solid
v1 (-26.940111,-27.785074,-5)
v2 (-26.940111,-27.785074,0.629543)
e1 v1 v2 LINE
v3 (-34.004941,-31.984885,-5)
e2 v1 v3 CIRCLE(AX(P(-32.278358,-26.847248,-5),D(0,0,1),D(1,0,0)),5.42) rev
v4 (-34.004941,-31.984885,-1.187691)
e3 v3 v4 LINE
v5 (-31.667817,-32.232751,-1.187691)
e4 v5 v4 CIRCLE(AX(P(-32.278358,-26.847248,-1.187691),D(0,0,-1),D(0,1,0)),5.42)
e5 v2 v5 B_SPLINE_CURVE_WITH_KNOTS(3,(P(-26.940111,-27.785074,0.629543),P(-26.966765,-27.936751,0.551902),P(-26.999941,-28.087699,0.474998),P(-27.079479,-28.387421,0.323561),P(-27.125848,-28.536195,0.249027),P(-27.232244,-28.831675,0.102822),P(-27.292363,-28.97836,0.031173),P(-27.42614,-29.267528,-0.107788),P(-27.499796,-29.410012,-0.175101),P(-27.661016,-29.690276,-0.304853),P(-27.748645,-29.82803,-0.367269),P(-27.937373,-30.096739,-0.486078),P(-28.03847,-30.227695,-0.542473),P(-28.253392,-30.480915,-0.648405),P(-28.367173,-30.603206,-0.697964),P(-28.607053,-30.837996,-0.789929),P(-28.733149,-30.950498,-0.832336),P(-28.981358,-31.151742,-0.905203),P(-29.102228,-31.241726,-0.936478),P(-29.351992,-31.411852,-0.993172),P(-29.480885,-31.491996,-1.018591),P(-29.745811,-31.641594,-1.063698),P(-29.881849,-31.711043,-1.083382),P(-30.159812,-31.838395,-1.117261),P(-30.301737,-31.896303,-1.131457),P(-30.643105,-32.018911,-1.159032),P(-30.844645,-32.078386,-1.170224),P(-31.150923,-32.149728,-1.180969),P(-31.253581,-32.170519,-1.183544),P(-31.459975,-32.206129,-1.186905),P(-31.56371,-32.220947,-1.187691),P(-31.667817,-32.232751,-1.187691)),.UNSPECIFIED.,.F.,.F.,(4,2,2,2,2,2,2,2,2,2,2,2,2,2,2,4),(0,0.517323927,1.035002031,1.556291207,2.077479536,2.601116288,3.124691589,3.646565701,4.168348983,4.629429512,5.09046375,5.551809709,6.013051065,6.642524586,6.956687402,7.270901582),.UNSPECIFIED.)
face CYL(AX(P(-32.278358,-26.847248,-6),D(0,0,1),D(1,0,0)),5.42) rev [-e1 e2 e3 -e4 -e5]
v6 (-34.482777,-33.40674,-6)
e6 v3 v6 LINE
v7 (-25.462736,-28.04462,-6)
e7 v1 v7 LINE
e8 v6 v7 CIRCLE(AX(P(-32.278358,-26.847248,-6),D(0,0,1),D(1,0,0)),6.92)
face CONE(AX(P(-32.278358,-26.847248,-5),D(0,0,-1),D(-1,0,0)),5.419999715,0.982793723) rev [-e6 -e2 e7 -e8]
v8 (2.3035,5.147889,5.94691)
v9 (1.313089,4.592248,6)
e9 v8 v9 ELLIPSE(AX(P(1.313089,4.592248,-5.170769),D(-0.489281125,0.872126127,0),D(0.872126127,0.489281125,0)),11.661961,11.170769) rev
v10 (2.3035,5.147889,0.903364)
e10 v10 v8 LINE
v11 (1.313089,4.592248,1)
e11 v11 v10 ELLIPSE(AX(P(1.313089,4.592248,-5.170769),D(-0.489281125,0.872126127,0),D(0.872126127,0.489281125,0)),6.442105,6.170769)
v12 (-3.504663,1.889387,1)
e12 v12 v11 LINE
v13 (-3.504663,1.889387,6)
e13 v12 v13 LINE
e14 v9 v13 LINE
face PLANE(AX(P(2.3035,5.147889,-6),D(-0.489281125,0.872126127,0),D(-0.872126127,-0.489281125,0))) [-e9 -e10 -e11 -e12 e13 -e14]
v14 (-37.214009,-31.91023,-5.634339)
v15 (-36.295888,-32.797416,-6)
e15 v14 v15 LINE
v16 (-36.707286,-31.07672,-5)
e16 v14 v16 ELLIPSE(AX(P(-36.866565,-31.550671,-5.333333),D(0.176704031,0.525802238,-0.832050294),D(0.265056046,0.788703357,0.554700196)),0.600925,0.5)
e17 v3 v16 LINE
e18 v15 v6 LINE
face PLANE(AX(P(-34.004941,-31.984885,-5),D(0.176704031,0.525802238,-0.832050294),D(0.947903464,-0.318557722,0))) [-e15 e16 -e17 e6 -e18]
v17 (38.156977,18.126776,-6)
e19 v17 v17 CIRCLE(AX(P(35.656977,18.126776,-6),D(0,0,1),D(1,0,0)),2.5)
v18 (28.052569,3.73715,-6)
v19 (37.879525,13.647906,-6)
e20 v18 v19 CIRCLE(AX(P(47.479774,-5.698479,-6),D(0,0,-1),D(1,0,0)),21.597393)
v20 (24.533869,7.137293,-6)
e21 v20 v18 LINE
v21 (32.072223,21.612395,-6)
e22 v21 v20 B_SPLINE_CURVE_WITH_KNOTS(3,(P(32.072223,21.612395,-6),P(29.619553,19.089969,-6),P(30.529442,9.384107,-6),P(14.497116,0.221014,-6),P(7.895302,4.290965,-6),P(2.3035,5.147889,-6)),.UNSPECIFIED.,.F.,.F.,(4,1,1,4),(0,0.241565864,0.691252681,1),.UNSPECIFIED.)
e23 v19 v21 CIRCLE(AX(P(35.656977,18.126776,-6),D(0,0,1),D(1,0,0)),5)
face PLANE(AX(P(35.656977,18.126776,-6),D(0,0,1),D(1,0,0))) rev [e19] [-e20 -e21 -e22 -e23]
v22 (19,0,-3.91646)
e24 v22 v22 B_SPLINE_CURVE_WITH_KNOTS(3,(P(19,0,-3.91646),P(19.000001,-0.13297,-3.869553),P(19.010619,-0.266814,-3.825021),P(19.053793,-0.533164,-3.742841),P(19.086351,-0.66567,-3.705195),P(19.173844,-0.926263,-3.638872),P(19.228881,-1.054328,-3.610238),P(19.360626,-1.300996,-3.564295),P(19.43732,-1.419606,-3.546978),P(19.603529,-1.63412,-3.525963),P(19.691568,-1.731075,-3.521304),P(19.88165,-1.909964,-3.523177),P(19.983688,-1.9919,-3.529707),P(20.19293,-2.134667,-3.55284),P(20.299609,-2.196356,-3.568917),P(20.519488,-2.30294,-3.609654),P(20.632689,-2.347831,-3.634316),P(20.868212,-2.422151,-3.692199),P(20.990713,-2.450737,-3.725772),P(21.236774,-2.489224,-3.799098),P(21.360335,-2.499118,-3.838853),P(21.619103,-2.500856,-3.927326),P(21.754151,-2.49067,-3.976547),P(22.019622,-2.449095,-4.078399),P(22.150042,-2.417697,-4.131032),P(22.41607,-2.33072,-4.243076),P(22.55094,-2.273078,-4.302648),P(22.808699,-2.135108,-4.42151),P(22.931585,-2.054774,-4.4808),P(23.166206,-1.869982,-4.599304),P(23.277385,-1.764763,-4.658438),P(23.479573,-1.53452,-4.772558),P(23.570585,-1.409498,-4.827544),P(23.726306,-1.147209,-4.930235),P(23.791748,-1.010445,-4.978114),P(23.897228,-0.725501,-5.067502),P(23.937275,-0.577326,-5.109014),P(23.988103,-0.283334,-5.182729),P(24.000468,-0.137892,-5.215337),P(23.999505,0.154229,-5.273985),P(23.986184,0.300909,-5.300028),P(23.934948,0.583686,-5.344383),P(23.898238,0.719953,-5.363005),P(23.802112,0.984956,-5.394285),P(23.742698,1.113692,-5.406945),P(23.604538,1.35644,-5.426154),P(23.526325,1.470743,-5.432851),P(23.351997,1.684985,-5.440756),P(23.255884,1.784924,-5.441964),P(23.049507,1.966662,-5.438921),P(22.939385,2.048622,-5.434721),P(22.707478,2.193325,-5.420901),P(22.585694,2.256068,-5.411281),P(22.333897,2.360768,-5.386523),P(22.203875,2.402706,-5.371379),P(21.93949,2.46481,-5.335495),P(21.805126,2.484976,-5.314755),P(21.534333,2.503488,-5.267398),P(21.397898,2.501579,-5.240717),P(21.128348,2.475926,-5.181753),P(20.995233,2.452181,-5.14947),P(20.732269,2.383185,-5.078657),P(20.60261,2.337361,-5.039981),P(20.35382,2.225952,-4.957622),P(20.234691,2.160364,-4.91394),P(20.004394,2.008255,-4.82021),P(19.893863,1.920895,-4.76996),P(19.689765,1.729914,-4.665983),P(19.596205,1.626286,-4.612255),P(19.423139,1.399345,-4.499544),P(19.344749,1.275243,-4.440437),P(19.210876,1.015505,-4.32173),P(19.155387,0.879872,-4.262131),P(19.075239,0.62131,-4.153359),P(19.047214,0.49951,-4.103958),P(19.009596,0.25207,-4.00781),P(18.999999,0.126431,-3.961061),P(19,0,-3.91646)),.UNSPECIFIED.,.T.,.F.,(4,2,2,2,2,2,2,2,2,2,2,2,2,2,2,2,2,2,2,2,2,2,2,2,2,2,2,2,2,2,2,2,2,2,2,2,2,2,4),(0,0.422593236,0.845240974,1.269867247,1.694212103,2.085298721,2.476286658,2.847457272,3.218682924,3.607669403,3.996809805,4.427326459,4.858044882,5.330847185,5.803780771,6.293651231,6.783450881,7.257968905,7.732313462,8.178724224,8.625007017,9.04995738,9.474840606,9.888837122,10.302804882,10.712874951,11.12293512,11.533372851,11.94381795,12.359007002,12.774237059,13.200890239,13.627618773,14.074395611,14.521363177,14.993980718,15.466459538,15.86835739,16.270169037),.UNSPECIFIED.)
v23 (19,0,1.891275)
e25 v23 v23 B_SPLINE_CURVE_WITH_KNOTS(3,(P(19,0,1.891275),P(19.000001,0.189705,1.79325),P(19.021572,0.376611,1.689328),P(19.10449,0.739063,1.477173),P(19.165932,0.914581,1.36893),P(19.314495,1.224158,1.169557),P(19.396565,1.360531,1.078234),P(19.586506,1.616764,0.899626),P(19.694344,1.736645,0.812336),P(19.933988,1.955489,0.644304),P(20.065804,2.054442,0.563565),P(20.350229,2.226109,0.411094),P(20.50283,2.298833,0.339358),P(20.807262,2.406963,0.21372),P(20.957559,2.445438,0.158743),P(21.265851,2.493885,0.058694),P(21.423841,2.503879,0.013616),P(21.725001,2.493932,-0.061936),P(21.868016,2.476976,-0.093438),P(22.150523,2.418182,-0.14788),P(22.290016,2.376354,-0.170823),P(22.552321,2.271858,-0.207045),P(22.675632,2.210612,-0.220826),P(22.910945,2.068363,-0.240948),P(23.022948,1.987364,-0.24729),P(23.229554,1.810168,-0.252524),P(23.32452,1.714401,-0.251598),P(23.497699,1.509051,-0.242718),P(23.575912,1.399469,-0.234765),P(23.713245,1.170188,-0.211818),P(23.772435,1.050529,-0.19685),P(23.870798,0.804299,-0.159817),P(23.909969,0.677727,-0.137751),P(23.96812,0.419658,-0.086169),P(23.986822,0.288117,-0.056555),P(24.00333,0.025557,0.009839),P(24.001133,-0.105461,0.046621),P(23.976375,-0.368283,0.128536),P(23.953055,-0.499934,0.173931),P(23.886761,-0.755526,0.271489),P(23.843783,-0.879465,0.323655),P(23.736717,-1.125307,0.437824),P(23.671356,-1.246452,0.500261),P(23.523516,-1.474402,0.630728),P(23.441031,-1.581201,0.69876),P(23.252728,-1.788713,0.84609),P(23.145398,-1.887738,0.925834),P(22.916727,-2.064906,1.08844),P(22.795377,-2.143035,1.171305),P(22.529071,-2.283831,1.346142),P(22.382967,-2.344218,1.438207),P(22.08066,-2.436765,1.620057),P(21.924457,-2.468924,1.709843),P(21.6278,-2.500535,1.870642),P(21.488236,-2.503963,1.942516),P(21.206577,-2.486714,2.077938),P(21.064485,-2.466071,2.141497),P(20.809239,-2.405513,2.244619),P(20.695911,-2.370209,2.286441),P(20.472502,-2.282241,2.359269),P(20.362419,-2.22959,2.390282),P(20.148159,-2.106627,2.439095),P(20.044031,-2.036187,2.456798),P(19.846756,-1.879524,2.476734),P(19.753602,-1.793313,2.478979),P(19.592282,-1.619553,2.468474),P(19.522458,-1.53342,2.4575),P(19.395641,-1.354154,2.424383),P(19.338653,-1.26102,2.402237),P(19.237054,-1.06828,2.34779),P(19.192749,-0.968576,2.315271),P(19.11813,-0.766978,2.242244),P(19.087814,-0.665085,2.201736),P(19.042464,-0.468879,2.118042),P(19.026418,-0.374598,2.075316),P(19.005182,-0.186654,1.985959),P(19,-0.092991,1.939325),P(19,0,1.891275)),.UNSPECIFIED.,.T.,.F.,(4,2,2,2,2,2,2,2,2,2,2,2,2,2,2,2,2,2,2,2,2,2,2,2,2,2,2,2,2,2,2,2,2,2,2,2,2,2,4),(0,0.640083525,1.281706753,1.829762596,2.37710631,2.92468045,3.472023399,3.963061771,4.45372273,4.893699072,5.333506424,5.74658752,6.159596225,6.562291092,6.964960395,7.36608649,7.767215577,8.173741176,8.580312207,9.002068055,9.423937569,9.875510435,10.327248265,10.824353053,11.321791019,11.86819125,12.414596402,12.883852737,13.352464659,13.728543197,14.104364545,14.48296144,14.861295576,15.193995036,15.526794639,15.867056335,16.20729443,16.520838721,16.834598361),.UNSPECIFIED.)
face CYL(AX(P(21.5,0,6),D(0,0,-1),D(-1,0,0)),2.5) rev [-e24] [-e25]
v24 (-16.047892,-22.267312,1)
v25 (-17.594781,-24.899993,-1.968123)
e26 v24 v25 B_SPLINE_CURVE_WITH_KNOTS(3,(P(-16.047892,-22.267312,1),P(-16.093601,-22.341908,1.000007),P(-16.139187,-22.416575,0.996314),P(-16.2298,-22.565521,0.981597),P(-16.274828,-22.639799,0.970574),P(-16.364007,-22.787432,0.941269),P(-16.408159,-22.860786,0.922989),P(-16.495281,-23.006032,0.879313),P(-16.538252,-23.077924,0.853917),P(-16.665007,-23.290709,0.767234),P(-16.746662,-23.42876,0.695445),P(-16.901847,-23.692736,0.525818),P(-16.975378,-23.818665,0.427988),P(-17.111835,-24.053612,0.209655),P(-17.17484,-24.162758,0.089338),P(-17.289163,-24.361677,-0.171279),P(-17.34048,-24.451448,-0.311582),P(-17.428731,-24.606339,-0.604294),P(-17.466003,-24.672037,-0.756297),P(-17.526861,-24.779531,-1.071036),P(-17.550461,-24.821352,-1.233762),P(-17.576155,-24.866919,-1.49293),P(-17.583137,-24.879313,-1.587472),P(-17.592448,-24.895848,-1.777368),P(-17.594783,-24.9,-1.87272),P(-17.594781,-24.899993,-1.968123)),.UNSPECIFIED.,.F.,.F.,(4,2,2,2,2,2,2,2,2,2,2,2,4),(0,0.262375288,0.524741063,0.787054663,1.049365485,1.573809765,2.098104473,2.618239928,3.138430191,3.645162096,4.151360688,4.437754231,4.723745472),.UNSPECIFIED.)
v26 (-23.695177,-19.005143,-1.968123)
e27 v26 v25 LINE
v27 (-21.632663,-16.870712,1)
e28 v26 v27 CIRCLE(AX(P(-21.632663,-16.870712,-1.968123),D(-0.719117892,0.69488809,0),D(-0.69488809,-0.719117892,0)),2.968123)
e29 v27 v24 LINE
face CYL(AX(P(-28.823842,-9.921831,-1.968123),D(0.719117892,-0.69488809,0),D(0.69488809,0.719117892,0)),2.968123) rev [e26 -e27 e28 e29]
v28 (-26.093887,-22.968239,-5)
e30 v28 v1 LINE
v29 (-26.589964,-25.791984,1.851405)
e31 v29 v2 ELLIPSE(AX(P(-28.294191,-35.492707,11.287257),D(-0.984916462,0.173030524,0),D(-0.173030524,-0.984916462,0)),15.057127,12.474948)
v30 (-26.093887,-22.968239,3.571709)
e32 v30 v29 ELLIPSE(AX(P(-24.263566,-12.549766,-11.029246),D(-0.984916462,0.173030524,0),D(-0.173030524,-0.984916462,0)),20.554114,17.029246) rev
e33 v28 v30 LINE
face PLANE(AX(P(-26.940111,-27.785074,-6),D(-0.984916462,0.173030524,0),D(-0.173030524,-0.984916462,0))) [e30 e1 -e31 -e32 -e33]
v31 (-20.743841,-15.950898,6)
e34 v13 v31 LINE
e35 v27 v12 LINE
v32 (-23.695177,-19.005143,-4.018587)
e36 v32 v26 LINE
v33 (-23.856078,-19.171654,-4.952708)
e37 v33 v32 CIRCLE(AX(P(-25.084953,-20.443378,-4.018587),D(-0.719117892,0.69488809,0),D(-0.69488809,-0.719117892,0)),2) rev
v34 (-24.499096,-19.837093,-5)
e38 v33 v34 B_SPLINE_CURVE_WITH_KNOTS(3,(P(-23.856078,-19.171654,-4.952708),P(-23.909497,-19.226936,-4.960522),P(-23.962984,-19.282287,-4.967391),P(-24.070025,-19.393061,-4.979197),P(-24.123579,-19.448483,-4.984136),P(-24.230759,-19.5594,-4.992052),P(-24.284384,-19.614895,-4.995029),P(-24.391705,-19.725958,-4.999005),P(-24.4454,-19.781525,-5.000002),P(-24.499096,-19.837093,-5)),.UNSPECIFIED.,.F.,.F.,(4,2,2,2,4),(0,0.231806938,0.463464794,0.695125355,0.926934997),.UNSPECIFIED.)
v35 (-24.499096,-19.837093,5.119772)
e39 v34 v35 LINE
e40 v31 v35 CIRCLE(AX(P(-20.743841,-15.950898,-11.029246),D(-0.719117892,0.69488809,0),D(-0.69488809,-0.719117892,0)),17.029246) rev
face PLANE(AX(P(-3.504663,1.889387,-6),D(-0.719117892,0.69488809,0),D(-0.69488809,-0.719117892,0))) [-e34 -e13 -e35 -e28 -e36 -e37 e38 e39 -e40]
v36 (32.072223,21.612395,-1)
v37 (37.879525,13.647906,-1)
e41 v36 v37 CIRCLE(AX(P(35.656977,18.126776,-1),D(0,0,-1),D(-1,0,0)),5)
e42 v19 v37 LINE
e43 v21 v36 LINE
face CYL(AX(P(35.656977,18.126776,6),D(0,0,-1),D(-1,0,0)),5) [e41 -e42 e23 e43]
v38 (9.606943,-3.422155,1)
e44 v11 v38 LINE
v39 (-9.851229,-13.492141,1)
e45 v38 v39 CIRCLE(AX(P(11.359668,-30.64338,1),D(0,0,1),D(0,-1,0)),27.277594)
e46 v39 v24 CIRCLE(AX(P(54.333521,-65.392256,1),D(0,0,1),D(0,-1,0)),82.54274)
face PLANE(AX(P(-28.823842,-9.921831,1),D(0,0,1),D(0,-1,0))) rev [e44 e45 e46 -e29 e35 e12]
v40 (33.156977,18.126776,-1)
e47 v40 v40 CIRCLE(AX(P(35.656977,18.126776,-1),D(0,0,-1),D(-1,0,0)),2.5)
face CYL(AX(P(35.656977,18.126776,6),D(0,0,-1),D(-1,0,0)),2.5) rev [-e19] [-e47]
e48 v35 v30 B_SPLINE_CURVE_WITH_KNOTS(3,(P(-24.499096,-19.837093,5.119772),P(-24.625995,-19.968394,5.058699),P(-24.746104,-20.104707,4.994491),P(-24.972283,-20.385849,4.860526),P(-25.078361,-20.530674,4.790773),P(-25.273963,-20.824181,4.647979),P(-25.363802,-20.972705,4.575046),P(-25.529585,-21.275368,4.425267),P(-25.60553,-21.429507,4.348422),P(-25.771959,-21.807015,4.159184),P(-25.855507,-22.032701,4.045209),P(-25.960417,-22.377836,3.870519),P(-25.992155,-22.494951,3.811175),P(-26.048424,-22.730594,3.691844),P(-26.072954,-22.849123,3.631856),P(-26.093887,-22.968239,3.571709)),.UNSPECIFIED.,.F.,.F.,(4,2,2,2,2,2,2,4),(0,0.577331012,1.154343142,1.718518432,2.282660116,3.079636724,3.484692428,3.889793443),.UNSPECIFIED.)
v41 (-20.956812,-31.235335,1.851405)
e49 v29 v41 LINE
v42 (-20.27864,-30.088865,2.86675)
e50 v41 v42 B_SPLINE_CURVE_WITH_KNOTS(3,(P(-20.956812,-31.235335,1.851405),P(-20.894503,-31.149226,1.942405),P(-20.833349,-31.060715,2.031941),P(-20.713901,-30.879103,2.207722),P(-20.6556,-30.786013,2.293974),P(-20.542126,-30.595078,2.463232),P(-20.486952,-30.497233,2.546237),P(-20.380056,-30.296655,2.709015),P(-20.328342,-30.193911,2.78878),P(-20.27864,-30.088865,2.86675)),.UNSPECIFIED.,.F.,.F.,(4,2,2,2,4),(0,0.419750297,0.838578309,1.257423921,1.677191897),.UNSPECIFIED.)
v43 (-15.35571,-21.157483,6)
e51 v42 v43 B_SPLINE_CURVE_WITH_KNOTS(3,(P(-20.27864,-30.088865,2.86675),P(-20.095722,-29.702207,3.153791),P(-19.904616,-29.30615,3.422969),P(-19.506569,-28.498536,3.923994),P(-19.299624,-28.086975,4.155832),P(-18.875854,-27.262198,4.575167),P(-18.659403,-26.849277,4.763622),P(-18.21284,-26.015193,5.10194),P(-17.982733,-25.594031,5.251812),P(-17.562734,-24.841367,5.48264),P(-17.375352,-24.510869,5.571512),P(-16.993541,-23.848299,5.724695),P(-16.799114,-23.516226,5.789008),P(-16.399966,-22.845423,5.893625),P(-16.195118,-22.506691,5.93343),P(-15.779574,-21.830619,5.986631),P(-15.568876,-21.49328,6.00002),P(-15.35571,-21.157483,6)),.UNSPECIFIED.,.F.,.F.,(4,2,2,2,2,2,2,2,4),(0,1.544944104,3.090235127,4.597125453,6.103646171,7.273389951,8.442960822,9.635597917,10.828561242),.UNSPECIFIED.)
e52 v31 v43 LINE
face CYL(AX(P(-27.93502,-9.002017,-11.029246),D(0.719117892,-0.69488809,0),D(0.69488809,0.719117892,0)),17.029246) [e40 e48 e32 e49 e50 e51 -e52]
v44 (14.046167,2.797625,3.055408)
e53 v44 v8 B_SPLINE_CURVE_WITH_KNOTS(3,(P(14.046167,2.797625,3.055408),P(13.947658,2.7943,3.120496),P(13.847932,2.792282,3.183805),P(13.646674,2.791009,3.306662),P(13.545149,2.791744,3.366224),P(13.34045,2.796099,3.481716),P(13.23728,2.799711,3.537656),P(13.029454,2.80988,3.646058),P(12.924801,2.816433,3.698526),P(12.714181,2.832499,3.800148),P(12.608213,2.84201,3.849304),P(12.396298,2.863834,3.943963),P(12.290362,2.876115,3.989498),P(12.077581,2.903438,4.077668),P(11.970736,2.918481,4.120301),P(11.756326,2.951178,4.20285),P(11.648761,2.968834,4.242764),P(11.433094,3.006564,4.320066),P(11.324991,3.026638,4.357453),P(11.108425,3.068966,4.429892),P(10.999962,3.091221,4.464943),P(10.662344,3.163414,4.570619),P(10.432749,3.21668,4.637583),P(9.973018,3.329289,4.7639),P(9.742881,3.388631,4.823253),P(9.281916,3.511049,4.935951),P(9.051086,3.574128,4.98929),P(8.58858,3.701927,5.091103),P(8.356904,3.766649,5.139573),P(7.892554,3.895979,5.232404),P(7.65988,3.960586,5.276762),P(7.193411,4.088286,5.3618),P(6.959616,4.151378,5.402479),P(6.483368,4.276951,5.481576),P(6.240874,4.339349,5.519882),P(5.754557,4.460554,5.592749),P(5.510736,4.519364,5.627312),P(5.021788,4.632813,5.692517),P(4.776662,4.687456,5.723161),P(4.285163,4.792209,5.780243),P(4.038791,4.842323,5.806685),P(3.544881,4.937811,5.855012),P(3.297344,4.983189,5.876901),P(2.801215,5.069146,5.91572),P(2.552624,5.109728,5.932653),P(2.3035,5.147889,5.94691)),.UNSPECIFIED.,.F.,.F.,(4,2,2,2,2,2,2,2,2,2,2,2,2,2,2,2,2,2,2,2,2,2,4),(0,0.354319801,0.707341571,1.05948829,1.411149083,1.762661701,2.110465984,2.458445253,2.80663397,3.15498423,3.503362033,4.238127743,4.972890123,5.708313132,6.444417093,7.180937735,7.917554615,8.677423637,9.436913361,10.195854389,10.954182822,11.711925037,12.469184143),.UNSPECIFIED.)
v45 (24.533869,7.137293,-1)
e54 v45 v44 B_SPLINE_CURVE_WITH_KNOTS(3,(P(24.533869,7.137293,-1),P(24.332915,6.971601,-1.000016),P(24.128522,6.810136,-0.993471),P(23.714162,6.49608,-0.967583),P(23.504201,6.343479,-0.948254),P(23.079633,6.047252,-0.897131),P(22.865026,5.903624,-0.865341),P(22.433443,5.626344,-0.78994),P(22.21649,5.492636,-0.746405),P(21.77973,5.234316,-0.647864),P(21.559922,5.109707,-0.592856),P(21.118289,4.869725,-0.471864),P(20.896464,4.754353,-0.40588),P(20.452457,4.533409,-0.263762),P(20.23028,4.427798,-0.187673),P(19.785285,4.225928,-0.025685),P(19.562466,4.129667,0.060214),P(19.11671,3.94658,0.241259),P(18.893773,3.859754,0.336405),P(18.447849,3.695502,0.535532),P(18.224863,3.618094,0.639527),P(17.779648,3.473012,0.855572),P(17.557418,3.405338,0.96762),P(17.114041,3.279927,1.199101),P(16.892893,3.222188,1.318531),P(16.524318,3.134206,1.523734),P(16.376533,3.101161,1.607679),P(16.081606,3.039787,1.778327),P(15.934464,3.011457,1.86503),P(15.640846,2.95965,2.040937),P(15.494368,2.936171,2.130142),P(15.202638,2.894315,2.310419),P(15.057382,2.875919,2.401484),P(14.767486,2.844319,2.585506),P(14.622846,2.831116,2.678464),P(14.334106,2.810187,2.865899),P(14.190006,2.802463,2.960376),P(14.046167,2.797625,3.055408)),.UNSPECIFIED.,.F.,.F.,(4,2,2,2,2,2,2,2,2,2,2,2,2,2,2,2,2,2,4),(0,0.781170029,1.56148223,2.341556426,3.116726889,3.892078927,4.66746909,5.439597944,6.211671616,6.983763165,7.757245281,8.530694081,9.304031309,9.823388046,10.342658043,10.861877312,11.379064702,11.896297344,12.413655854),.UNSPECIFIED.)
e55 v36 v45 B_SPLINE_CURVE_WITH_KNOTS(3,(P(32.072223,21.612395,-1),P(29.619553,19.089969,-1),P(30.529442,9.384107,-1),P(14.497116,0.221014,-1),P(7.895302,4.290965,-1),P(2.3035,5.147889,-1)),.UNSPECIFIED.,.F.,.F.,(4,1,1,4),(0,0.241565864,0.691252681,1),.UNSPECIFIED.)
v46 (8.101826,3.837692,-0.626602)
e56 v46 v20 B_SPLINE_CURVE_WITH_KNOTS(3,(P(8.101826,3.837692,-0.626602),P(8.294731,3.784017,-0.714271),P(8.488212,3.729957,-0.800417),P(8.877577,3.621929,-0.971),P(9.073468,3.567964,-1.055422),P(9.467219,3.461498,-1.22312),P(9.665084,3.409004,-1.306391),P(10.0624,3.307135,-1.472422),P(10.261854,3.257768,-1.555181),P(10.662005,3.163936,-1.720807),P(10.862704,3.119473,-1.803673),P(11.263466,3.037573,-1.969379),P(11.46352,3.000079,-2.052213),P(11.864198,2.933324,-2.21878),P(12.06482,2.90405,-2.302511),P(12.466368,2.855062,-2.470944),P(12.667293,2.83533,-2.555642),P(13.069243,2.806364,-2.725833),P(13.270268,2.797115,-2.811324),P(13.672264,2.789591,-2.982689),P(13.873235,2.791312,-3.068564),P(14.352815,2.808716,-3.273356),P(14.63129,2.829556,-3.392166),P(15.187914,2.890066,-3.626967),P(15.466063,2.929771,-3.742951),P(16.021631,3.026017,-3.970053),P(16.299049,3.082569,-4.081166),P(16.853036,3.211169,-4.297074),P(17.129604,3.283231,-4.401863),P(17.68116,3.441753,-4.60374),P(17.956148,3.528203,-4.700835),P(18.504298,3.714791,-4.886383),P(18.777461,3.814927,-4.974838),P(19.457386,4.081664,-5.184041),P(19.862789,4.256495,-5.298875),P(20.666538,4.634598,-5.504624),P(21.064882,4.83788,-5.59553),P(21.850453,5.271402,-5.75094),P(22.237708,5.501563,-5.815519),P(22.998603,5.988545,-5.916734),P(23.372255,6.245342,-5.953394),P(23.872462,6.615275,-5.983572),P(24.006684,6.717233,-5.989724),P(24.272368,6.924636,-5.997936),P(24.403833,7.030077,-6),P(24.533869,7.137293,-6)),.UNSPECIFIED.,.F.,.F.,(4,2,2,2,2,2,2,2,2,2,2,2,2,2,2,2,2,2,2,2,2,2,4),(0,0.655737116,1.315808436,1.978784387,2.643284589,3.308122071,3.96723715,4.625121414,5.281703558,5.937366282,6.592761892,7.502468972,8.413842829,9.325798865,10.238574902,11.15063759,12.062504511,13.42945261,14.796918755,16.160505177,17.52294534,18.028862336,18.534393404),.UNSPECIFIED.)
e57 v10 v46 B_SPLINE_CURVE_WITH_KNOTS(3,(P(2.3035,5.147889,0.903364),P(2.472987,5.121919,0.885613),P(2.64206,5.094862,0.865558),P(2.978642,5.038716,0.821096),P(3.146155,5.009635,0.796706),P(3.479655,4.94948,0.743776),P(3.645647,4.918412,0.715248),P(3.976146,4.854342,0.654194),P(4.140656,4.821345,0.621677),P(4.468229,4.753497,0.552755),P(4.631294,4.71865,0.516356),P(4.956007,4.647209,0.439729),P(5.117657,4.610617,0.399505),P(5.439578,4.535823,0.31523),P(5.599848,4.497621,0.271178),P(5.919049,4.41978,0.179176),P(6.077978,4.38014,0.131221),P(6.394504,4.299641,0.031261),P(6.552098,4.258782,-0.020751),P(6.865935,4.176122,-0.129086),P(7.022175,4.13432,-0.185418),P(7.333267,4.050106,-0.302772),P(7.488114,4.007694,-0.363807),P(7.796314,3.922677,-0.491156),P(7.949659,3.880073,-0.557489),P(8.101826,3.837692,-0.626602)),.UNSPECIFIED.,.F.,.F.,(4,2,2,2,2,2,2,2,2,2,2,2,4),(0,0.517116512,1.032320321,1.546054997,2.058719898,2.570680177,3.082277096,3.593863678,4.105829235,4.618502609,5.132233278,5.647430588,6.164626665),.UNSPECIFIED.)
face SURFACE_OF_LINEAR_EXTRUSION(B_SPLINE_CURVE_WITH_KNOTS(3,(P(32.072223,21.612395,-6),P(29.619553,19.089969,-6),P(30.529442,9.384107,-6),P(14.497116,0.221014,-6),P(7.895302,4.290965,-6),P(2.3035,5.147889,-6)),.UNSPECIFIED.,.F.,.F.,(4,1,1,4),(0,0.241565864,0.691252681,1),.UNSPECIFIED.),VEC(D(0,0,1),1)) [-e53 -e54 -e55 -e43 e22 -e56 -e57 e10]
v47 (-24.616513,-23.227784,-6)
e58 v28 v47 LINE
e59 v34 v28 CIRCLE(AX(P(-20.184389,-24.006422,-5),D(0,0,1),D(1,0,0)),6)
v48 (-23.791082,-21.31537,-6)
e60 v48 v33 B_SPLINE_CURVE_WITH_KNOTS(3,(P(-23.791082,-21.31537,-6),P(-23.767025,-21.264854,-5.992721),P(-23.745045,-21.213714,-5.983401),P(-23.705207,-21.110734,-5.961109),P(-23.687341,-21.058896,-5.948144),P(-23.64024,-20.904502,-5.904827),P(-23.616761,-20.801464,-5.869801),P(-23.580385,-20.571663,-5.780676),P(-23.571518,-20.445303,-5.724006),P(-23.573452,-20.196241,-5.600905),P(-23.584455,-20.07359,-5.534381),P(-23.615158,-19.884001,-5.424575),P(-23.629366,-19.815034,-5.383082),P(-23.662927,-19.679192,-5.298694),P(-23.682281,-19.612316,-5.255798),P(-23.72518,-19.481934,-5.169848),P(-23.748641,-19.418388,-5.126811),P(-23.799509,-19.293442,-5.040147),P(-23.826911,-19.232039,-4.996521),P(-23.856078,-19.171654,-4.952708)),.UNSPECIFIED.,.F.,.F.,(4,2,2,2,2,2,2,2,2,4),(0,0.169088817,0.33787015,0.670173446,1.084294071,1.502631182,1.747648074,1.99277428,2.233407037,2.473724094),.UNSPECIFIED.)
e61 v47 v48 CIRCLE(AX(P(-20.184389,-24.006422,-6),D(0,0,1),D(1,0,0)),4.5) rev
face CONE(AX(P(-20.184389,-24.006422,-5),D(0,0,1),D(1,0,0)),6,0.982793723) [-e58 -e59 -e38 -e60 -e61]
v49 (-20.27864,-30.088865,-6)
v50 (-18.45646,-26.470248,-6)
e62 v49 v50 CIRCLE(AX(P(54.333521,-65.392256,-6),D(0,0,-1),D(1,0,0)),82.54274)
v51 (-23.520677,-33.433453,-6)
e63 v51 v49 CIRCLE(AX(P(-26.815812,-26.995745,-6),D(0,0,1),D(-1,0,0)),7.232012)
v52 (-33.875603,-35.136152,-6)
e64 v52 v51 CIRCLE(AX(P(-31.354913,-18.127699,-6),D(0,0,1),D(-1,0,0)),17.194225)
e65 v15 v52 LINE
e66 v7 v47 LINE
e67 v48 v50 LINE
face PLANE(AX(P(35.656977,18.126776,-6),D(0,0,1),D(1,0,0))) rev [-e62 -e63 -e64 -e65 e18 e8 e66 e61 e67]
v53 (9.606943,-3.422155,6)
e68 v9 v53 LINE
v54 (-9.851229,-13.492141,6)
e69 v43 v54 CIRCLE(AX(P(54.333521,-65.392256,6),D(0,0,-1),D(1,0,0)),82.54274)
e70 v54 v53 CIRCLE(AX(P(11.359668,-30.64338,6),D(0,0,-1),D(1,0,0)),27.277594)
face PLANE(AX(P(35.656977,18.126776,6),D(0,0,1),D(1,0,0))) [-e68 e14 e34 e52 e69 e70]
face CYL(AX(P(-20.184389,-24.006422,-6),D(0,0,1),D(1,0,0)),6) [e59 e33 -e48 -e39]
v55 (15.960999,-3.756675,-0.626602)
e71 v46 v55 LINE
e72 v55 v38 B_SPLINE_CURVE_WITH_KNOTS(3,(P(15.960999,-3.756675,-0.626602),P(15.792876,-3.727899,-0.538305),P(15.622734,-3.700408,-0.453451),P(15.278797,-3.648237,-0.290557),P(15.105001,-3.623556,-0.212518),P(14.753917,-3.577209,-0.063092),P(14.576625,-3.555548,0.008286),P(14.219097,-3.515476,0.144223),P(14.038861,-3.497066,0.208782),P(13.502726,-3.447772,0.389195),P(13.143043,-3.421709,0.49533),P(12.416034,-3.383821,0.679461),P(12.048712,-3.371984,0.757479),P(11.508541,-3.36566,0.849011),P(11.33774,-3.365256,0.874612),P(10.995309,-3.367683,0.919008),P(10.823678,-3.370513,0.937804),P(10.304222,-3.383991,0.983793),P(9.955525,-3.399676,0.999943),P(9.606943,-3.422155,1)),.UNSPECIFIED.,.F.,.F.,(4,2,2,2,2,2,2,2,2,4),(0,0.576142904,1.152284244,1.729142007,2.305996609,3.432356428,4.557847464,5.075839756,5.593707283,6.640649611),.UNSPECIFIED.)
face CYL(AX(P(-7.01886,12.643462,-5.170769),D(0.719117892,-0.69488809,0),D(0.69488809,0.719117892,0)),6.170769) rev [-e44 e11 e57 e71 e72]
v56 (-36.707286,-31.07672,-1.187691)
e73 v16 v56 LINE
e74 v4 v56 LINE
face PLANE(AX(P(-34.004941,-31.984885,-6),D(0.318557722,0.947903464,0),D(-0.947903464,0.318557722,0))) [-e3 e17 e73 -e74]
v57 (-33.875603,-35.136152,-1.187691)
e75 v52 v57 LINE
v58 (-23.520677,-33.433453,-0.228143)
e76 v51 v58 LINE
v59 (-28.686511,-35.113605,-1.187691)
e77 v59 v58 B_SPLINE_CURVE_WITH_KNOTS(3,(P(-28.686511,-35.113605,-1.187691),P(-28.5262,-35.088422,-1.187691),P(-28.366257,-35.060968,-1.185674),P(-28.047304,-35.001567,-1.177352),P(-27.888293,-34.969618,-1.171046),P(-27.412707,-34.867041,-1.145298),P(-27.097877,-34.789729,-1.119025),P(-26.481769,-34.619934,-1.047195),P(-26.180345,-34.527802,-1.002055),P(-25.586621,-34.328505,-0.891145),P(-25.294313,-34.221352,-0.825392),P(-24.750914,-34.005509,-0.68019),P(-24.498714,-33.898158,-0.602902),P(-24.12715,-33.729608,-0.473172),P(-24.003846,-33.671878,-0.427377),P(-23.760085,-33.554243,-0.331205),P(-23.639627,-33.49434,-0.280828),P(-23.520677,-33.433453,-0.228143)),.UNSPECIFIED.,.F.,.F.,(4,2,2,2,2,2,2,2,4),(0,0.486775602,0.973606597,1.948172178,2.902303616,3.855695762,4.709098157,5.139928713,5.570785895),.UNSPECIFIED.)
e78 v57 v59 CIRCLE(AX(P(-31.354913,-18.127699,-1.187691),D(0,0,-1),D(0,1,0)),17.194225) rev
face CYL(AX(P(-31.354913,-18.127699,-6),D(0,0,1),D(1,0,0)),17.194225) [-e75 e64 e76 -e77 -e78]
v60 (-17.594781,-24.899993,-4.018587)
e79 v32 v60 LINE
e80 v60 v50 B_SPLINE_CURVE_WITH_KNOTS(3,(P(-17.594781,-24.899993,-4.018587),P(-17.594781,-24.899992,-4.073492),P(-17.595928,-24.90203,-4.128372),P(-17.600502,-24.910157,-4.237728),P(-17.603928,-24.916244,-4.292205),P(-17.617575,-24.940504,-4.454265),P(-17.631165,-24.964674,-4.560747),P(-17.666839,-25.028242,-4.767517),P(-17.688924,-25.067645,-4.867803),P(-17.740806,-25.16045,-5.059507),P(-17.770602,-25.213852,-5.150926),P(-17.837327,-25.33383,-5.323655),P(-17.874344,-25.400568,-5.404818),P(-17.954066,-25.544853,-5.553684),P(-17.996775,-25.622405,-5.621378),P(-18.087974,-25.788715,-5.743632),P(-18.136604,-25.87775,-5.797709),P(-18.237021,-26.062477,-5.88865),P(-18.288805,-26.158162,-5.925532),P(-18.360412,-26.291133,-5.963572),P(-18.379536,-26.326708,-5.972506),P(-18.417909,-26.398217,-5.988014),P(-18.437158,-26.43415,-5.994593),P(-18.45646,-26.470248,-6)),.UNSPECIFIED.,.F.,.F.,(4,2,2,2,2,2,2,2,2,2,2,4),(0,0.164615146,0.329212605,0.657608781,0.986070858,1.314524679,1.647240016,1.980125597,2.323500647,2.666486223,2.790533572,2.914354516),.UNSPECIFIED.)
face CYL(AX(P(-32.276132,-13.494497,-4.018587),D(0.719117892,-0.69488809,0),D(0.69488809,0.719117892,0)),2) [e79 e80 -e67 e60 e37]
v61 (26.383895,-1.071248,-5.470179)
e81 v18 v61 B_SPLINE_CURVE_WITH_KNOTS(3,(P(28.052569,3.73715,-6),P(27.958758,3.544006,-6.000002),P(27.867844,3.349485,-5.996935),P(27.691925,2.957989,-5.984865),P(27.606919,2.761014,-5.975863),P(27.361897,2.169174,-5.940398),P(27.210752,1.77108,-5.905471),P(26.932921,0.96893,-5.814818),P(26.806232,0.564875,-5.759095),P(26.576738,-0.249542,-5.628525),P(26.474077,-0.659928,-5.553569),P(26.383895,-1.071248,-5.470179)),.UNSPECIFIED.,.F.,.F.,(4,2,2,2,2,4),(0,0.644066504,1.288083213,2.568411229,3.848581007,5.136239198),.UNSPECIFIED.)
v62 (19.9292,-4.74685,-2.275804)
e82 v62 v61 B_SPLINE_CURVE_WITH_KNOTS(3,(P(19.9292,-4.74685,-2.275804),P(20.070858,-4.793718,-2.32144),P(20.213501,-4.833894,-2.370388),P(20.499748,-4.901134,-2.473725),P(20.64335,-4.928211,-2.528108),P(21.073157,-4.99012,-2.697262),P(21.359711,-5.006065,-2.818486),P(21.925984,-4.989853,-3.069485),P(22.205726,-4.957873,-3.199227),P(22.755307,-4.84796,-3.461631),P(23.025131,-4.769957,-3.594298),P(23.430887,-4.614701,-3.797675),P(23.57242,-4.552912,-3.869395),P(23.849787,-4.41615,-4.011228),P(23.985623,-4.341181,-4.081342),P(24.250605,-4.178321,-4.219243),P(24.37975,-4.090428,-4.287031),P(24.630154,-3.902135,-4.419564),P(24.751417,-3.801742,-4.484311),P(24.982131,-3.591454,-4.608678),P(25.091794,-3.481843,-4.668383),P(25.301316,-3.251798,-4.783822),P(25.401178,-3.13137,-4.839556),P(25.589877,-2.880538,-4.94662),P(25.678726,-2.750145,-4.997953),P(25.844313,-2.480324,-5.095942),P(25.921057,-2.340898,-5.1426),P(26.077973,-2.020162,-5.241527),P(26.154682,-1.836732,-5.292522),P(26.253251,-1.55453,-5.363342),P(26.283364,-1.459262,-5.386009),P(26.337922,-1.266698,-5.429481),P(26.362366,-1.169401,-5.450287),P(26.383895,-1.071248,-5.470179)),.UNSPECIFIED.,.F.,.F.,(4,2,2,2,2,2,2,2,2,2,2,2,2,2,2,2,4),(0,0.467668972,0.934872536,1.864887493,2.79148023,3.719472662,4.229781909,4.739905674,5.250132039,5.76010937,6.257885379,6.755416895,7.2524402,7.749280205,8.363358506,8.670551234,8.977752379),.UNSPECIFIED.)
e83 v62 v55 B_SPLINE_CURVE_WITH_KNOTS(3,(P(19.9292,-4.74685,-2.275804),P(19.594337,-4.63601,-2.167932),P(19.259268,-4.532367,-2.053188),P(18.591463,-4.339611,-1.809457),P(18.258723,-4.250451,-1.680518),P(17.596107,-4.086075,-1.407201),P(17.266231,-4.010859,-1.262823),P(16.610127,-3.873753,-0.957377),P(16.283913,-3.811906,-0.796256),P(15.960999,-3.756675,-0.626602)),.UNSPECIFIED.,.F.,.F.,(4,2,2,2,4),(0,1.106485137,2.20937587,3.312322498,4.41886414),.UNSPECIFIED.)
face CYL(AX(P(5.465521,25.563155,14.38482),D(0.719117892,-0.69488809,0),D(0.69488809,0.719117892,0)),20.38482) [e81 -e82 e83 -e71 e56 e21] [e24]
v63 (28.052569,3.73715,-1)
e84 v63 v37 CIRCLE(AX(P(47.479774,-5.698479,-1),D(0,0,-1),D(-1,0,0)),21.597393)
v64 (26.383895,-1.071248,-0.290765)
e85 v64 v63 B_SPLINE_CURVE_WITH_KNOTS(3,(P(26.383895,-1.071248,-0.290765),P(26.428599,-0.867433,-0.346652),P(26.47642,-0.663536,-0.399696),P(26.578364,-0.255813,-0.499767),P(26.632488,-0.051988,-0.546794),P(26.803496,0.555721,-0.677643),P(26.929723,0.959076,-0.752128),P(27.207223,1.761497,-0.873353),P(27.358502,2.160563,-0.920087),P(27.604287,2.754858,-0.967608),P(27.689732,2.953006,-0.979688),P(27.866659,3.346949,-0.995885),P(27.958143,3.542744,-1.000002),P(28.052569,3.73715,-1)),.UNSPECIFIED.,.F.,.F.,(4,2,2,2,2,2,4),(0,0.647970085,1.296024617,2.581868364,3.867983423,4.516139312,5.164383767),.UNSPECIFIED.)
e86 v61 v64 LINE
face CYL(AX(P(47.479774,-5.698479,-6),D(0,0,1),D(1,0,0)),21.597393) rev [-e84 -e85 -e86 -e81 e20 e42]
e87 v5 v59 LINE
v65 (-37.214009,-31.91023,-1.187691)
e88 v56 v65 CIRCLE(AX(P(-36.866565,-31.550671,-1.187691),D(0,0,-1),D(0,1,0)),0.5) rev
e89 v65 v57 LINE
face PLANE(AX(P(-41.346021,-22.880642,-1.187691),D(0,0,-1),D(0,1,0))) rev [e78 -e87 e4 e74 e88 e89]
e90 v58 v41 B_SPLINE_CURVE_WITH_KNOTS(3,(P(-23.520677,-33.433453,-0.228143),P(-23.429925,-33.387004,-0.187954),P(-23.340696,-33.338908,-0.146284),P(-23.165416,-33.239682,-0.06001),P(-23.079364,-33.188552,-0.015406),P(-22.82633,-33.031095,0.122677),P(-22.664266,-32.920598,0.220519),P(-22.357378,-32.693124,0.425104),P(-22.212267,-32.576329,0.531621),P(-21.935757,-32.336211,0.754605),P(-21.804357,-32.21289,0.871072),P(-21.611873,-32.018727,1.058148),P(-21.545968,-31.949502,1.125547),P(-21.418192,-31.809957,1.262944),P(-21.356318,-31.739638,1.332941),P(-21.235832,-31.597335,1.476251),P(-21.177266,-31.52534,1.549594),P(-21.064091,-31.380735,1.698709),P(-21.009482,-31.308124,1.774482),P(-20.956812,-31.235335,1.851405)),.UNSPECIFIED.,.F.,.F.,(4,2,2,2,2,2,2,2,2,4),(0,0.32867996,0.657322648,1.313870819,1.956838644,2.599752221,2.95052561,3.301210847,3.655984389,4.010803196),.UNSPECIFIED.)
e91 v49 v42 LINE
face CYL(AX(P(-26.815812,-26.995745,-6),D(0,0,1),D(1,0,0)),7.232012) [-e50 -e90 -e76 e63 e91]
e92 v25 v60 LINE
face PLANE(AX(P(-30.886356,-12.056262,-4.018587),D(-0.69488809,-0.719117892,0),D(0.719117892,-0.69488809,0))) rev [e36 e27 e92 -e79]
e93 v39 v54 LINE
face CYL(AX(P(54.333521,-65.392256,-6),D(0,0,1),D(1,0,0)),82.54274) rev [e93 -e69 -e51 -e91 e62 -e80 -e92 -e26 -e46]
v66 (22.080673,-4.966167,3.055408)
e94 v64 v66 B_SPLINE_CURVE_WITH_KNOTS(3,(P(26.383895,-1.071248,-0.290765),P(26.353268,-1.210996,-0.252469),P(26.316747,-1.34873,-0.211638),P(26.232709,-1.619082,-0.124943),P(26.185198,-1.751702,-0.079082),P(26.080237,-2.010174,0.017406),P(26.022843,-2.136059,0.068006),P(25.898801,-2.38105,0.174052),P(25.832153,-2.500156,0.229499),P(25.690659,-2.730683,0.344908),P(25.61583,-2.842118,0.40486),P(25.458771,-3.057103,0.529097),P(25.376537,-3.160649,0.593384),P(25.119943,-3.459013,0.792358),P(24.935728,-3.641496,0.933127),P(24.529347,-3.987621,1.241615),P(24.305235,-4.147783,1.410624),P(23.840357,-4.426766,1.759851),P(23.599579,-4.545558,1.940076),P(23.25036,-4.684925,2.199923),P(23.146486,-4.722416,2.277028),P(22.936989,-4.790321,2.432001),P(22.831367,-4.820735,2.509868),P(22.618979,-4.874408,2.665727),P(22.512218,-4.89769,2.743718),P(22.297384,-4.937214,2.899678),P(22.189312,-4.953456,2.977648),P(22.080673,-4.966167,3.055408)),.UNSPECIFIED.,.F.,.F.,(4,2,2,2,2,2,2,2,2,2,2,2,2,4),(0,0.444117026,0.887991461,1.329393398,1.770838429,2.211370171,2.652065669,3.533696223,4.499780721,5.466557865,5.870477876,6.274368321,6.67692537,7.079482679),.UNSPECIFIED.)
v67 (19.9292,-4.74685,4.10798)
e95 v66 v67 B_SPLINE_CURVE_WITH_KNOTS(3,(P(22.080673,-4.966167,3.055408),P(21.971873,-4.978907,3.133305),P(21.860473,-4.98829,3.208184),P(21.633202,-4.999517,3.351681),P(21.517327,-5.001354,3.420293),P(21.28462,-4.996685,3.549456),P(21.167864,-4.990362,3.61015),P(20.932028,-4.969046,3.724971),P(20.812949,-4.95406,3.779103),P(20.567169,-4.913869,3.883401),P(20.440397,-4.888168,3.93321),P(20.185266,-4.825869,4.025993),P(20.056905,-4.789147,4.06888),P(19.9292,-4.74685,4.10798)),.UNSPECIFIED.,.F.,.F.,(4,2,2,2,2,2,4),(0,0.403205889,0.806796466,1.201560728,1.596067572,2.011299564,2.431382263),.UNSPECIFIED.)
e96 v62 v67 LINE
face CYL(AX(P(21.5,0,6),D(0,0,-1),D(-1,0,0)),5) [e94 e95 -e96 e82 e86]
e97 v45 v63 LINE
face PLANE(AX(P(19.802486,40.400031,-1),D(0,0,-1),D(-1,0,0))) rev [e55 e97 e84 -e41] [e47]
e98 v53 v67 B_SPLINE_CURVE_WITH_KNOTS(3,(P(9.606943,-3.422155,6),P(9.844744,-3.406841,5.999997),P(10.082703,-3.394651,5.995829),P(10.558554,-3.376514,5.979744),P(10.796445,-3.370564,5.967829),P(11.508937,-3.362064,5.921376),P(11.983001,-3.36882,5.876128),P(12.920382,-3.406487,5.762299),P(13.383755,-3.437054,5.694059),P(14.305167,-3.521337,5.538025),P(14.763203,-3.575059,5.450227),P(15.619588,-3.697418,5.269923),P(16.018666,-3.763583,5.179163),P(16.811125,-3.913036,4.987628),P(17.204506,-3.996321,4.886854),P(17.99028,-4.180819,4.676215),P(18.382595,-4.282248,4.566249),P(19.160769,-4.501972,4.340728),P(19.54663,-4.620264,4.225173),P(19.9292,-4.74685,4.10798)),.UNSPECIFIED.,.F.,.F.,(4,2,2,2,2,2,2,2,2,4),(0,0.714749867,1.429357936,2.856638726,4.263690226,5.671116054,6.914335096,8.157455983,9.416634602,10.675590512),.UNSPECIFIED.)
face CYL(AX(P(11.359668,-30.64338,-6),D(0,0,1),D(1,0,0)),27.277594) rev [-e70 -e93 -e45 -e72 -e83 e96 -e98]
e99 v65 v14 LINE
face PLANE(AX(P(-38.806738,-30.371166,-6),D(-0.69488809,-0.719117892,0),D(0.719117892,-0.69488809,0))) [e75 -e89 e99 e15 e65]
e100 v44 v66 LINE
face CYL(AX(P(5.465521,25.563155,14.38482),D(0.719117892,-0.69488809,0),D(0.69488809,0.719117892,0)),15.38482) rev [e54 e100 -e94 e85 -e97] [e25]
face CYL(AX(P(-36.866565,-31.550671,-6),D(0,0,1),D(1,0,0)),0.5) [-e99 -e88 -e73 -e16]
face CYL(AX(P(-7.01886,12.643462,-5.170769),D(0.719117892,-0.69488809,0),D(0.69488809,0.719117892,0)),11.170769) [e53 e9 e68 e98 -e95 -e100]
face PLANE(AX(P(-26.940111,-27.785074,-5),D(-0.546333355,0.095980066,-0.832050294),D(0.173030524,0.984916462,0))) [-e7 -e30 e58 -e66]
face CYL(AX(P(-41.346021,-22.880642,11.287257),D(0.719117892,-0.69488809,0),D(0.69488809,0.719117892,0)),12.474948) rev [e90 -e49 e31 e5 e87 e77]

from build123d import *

# Parameters (mm, degrees)
SKETCH_1_R               = 2.5
EXTRUDE_1_DEPTH          = 6
SKETCH_2_OUTSIDE_W       = 116.224
SKETCH_2_OUTSIDE_H       = 89.061
CUT_EXTRUDE_1_DEPTH      = 12
CUT_EXTRUDE_2_DEPTH      = 10
CUT_EXTRUDE_2_DEPTH_BACK = 58.99683528
SKETCH_3_OUTSIDE_W       = 33.874
SKETCH_3_OUTSIDE_H       = 119.124
FILLET_1_R               = 0.5


with BuildPart() as part:
    # 草圖1 → 填料-伸長1 (new, symmetric)
    with BuildSketch(Plane.XY):
        with BuildLine():
            Line((33.210571119, 22.487406669), (9.212656684, 9.024071248))
            Line((9.212656684, 9.024071248), (9.212656684, 13.217540535))
            Line((9.212656684, 13.217540535), (-51.018500429, 13.217540535))
            Line((-51.018500429, 13.217540535), (-51.018500429, -41.386180002))
            Line((-51.018500429, -41.386180002), (9.212656684, -41.386180002))
            Line((9.212656684, -41.386180002), (9.212656684, -5))
            Line((9.212656684, -5), (21.5, -5))
            ThreePointArc((21.5, -5), (23.692257033, -4.493774483), (25.440603486, -3.07760364))
            Line((25.440603486, -3.07760364), (39.59758023, 15.049172396))
            ThreePointArc((39.59758023, 15.049172396), (39.450390654, 21.384077206), (33.210571119, 22.487406669))
        make_face()
        with Locations((21.5, 0)):
            Circle(SKETCH_1_R, mode=Mode.SUBTRACT)
        with Locations((35.656976744, 18.126776036)):
            Circle(SKETCH_1_R, mode=Mode.SUBTRACT)
    extrude(amount=EXTRUDE_1_DEPTH, both=True)

    # 草圖2 outside → 除料-伸長1 (cut)
    with BuildSketch(Plane.XY.offset(6)):
        with Locations((-5.181, -9.1295)):
            Rectangle(SKETCH_2_OUTSIDE_W, SKETCH_2_OUTSIDE_H)
        with BuildLine():
            Line((-3.504662874, 1.889387135), (-24.499095951, -19.837093245))
            ThreePointArc((-24.499095951, -19.837093245), (-25.530846828, -21.28330144), (-26.093887373, -22.968238639))
            Line((-26.093887373, -22.968238639), (-26.940110928, -27.785073774))
            ThreePointArc((-26.940110928, -27.785073774), (-29.508767127, -31.506192899), (-34.004940633, -31.984884889))
            Line((-34.004940633, -31.984884889), (-38.806738202, -30.371166034))
            Line((-38.806738202, -30.371166034), (-33.875603228, -35.136152419))
            ThreePointArc((-33.875603228, -35.136152419), (-28.5650672, -35.094081272), (-23.520676583, -33.433453021))
            ThreePointArc((-23.520676583, -33.433453021), (-21.623015625, -32.029319154), (-20.278640263, -30.088864592))
            ThreePointArc((-20.278640263, -30.088864592), (-15.559314436, -21.479893225), (-9.851228903, -13.492141112))
            ThreePointArc((-9.851228903, -13.492141112), (3.673898096, -4.470950273), (19.929199503, -4.746850092))
            ThreePointArc((19.929199503, -4.746850092), (23.974199209, -4.344920975), (26.383894798, -1.071247685))
            ThreePointArc((26.383894798, -1.071247685), (30.458421446, 7.595163953), (37.879524863, 13.647905658))
            ThreePointArc((37.879524863, 13.647905658), (39.697047859, 21.072590929), (32.072223107, 21.612395258))
            add(Edge.make_bspline(
                [(32.072223107, 21.612395258), (29.619553058, 19.089968877), (30.529442098, 9.384107467), (14.497116464, 0.221014353), (7.895302384, 4.290965143), (2.303499892, 5.147888773)],
                knots=[0, 0, 0, 0, 0.241565864, 0.691252681, 1, 1, 1, 1], degree=3))
            Line((2.303499892, 5.147888773), (-3.504662874, 1.889387135))
        make_face(mode=Mode.SUBTRACT)
    extrude(amount=-CUT_EXTRUDE_1_DEPTH, mode=Mode.SUBTRACT)

    # 草圖3 outside → 除料-伸長2 (cut, two sides: drawn at the far end of the back side and taken through both)
    with BuildSketch(Plane(origin=(-2.756507166, 2.663630014, 0), x_dir=(0, 0, 1), z_dir=(-0.7191178918168458, 0.6948880900324134, 0)).offset(-CUT_EXTRUDE_2_DEPTH_BACK)):
        with Locations((0, -3.742)):
            Rectangle(SKETCH_3_OUTSIDE_W, SKETCH_3_OUTSIDE_H)
        with BuildLine():
            Line((-6.187691288, -50.234611396), (-6.018499381, -32.113761289))
            ThreePointArc((-6.018499381, -32.113761289), (-5.426182761, -30.711634106), (-4.018586552, -30.132434202))
            Line((-4.018586552, -30.132434202), (-1.968123233, -30.132434202))
            ThreePointArc((-1.968123233, -30.132434202), (0.130656832, -29.263091034), (1, -27.164310969))
            Line((1, -27.164310969), (1, 4.214817456))
            ThreePointArc((1, 4.214817456), (0.578987205, 6.455061571), (-0.626602337, 8.38961561))
            ThreePointArc((-0.626602337, 8.38961561), (-4.609205755, 14.780315976), (-6, 22.180847883))
            Line((-6, 22.180847883), (-6, 42.812897435))
            Line((-6, 42.812897435), (-1, 42.812897435))
            Line((-1, 42.812897435), (-1, 22.180847883))
            ThreePointArc((-1, 22.180847883), (0.049659461, 16.595522548), (3.055407703, 11.772336713))
            ThreePointArc((3.055407703, 11.772336713), (5.237852421, 8.270268144), (6, 4.214817456))
            Line((6, 4.214817456), (6, -25.885224287))
            ThreePointArc((6, -25.885224287), (4.929184182, -31.828600934), (1.85140464, -37.024526797))
            ThreePointArc((1.85140464, -37.024526797), (-0.403254217, -40.83085539), (-1.187691288, -45.184736692))
            Line((-1.187691288, -45.184736692), (-1.187691288, -50.234611396))
            Line((-1.187691288, -50.234611396), (-6.187691288, -50.234611396))
        make_face(mode=Mode.SUBTRACT)
    extrude(amount=CUT_EXTRUDE_2_DEPTH + CUT_EXTRUDE_2_DEPTH_BACK, mode=Mode.SUBTRACT)

    # 導角1
    # the kernel refuses this chamfer: 1.5, 1 mm, written as the material it takes off along each edge
    with BuildSketch(Plane(origin=(-26.093887373, -22.968238639, -6), x_dir=(-0.282693705610689, 0.04966374508326484, 0.9579236823632671), z_dir=(-0.1730305243432829, -0.9849164622674802, 0))) as chamfer_1_piece_1:
        with BuildLine():
            Line((1.304503805, 0), (-0.777114665, -1.723908552))
            Line((-0.777114665, -1.723908552), (-0.992647493, -1.65932837))
            ThreePointArc((-0.992647493, -1.65932837), (-0.484534059, -0.833196734), (-0.215532829, 0.064580181))
            Line((-0.215532829, 0.064580181), (0.064580181, 0.215532829))
            ThreePointArc((0.064580181, 0.215532829), (0.663098125, 0.036198675), (1.369083986, 0.215532829))
            Line((1.369083986, 0.215532829), (1.304503805, 0))
        make_face()
    extrude(amount=4.890602726, mode=Mode.SUBTRACT)
    with BuildSketch(Plane(origin=(-34.004940633, -31.984884889, -6), x_dir=(0.0914334019577149, 0.27207012289855914, 0.9579236823632674), z_dir=(-0.9479034644759905, 0.31855772166816915, 0))) as chamfer_1_piece_2:
        with BuildLine():
            Line((1.304503805, 0), (-0.777114665, -1.723908552))
            Line((-0.777114665, -1.723908552), (-0.992647493, -1.65932837))
            ThreePointArc((-0.992647493, -1.65932837), (-0.484534059, -0.833196734), (-0.215532829, 0.064580181))
            Line((-0.215532829, 0.064580181), (0.064580181, 0.215532829))
            ThreePointArc((0.064580181, 0.215532829), (0.663098125, 0.036198675), (1.369083986, 0.215532829))
            Line((1.369083986, 0.215532829), (1.304503805, 0))
        make_face()
    extrude(amount=9.793128388, mode=Mode.SUBTRACT)
    with BuildSketch(Plane(origin=(-20.1843886, -24.006421785, -6), x_dir=(-0.1096964588169662, 0.9939651336556115, 0), z_dir=(0.9939651336556115, 0.1096964588169662, 0))) as chamfer_1_piece_3:
        with BuildLine():
            Line((6.374422632, 1.249615088), (4.125577368, -0.249615088))
            Line((4.125577368, -0.249615088), (4.125577368, -0.474615088))
            ThreePointArc((4.125577368, -0.474615088), (5.062788684, -0.225), (6, -0.225))
            Line((6, -0.225), (6.225, 0))
            ThreePointArc((6.225, 0), (6.225, 0.624807544), (6.599422632, 1.249615088))
            Line((6.599422632, 1.249615088), (6.374422632, 1.249615088))
        make_face()
    revolve(axis=Axis((-20.1843886, -24.006421785, -6), (0, 0, 1)), revolution_arc=73.738114823, mode=Mode.SUBTRACT)
    with BuildSketch(Plane(origin=(-32.278357873, -26.847248381, -6), x_dir=(0.9849164622674801, -0.17303052434328284, 0), z_dir=(0.17303052434328284, 0.9849164622674801, 0))) as chamfer_1_piece_4:
        with BuildLine():
            Line((5.045577083, -1.249615088), (7.294422348, 0.249615088))
            Line((7.294422348, 0.249615088), (7.294422348, 0.474615088))
            ThreePointArc((7.294422348, 0.474615088), (6.357211031, 0.225), (5.419999715, 0.225))
            Line((5.419999715, 0.225), (5.194999715, 0))
            ThreePointArc((5.194999715, 0), (5.194999715, -0.624807544), (4.820577083, -1.249615088))
            Line((4.820577083, -1.249615088), (5.045577083, -1.249615088))
        make_face()
    revolve(axis=Axis((-32.278357873, -26.847248381, -6), (0, 0, -1)), revolution_arc=98.611657286, mode=Mode.SUBTRACT)

    # 圓角1
    fillet_1_edges = [part.edges().sort_by_distance(p)[0] for p in [
        (-38.806738202, -30.371166034, -3.093845644),
    ]]
    fillet(fillet_1_edges, radius=FILLET_1_R)


solid = part.part
